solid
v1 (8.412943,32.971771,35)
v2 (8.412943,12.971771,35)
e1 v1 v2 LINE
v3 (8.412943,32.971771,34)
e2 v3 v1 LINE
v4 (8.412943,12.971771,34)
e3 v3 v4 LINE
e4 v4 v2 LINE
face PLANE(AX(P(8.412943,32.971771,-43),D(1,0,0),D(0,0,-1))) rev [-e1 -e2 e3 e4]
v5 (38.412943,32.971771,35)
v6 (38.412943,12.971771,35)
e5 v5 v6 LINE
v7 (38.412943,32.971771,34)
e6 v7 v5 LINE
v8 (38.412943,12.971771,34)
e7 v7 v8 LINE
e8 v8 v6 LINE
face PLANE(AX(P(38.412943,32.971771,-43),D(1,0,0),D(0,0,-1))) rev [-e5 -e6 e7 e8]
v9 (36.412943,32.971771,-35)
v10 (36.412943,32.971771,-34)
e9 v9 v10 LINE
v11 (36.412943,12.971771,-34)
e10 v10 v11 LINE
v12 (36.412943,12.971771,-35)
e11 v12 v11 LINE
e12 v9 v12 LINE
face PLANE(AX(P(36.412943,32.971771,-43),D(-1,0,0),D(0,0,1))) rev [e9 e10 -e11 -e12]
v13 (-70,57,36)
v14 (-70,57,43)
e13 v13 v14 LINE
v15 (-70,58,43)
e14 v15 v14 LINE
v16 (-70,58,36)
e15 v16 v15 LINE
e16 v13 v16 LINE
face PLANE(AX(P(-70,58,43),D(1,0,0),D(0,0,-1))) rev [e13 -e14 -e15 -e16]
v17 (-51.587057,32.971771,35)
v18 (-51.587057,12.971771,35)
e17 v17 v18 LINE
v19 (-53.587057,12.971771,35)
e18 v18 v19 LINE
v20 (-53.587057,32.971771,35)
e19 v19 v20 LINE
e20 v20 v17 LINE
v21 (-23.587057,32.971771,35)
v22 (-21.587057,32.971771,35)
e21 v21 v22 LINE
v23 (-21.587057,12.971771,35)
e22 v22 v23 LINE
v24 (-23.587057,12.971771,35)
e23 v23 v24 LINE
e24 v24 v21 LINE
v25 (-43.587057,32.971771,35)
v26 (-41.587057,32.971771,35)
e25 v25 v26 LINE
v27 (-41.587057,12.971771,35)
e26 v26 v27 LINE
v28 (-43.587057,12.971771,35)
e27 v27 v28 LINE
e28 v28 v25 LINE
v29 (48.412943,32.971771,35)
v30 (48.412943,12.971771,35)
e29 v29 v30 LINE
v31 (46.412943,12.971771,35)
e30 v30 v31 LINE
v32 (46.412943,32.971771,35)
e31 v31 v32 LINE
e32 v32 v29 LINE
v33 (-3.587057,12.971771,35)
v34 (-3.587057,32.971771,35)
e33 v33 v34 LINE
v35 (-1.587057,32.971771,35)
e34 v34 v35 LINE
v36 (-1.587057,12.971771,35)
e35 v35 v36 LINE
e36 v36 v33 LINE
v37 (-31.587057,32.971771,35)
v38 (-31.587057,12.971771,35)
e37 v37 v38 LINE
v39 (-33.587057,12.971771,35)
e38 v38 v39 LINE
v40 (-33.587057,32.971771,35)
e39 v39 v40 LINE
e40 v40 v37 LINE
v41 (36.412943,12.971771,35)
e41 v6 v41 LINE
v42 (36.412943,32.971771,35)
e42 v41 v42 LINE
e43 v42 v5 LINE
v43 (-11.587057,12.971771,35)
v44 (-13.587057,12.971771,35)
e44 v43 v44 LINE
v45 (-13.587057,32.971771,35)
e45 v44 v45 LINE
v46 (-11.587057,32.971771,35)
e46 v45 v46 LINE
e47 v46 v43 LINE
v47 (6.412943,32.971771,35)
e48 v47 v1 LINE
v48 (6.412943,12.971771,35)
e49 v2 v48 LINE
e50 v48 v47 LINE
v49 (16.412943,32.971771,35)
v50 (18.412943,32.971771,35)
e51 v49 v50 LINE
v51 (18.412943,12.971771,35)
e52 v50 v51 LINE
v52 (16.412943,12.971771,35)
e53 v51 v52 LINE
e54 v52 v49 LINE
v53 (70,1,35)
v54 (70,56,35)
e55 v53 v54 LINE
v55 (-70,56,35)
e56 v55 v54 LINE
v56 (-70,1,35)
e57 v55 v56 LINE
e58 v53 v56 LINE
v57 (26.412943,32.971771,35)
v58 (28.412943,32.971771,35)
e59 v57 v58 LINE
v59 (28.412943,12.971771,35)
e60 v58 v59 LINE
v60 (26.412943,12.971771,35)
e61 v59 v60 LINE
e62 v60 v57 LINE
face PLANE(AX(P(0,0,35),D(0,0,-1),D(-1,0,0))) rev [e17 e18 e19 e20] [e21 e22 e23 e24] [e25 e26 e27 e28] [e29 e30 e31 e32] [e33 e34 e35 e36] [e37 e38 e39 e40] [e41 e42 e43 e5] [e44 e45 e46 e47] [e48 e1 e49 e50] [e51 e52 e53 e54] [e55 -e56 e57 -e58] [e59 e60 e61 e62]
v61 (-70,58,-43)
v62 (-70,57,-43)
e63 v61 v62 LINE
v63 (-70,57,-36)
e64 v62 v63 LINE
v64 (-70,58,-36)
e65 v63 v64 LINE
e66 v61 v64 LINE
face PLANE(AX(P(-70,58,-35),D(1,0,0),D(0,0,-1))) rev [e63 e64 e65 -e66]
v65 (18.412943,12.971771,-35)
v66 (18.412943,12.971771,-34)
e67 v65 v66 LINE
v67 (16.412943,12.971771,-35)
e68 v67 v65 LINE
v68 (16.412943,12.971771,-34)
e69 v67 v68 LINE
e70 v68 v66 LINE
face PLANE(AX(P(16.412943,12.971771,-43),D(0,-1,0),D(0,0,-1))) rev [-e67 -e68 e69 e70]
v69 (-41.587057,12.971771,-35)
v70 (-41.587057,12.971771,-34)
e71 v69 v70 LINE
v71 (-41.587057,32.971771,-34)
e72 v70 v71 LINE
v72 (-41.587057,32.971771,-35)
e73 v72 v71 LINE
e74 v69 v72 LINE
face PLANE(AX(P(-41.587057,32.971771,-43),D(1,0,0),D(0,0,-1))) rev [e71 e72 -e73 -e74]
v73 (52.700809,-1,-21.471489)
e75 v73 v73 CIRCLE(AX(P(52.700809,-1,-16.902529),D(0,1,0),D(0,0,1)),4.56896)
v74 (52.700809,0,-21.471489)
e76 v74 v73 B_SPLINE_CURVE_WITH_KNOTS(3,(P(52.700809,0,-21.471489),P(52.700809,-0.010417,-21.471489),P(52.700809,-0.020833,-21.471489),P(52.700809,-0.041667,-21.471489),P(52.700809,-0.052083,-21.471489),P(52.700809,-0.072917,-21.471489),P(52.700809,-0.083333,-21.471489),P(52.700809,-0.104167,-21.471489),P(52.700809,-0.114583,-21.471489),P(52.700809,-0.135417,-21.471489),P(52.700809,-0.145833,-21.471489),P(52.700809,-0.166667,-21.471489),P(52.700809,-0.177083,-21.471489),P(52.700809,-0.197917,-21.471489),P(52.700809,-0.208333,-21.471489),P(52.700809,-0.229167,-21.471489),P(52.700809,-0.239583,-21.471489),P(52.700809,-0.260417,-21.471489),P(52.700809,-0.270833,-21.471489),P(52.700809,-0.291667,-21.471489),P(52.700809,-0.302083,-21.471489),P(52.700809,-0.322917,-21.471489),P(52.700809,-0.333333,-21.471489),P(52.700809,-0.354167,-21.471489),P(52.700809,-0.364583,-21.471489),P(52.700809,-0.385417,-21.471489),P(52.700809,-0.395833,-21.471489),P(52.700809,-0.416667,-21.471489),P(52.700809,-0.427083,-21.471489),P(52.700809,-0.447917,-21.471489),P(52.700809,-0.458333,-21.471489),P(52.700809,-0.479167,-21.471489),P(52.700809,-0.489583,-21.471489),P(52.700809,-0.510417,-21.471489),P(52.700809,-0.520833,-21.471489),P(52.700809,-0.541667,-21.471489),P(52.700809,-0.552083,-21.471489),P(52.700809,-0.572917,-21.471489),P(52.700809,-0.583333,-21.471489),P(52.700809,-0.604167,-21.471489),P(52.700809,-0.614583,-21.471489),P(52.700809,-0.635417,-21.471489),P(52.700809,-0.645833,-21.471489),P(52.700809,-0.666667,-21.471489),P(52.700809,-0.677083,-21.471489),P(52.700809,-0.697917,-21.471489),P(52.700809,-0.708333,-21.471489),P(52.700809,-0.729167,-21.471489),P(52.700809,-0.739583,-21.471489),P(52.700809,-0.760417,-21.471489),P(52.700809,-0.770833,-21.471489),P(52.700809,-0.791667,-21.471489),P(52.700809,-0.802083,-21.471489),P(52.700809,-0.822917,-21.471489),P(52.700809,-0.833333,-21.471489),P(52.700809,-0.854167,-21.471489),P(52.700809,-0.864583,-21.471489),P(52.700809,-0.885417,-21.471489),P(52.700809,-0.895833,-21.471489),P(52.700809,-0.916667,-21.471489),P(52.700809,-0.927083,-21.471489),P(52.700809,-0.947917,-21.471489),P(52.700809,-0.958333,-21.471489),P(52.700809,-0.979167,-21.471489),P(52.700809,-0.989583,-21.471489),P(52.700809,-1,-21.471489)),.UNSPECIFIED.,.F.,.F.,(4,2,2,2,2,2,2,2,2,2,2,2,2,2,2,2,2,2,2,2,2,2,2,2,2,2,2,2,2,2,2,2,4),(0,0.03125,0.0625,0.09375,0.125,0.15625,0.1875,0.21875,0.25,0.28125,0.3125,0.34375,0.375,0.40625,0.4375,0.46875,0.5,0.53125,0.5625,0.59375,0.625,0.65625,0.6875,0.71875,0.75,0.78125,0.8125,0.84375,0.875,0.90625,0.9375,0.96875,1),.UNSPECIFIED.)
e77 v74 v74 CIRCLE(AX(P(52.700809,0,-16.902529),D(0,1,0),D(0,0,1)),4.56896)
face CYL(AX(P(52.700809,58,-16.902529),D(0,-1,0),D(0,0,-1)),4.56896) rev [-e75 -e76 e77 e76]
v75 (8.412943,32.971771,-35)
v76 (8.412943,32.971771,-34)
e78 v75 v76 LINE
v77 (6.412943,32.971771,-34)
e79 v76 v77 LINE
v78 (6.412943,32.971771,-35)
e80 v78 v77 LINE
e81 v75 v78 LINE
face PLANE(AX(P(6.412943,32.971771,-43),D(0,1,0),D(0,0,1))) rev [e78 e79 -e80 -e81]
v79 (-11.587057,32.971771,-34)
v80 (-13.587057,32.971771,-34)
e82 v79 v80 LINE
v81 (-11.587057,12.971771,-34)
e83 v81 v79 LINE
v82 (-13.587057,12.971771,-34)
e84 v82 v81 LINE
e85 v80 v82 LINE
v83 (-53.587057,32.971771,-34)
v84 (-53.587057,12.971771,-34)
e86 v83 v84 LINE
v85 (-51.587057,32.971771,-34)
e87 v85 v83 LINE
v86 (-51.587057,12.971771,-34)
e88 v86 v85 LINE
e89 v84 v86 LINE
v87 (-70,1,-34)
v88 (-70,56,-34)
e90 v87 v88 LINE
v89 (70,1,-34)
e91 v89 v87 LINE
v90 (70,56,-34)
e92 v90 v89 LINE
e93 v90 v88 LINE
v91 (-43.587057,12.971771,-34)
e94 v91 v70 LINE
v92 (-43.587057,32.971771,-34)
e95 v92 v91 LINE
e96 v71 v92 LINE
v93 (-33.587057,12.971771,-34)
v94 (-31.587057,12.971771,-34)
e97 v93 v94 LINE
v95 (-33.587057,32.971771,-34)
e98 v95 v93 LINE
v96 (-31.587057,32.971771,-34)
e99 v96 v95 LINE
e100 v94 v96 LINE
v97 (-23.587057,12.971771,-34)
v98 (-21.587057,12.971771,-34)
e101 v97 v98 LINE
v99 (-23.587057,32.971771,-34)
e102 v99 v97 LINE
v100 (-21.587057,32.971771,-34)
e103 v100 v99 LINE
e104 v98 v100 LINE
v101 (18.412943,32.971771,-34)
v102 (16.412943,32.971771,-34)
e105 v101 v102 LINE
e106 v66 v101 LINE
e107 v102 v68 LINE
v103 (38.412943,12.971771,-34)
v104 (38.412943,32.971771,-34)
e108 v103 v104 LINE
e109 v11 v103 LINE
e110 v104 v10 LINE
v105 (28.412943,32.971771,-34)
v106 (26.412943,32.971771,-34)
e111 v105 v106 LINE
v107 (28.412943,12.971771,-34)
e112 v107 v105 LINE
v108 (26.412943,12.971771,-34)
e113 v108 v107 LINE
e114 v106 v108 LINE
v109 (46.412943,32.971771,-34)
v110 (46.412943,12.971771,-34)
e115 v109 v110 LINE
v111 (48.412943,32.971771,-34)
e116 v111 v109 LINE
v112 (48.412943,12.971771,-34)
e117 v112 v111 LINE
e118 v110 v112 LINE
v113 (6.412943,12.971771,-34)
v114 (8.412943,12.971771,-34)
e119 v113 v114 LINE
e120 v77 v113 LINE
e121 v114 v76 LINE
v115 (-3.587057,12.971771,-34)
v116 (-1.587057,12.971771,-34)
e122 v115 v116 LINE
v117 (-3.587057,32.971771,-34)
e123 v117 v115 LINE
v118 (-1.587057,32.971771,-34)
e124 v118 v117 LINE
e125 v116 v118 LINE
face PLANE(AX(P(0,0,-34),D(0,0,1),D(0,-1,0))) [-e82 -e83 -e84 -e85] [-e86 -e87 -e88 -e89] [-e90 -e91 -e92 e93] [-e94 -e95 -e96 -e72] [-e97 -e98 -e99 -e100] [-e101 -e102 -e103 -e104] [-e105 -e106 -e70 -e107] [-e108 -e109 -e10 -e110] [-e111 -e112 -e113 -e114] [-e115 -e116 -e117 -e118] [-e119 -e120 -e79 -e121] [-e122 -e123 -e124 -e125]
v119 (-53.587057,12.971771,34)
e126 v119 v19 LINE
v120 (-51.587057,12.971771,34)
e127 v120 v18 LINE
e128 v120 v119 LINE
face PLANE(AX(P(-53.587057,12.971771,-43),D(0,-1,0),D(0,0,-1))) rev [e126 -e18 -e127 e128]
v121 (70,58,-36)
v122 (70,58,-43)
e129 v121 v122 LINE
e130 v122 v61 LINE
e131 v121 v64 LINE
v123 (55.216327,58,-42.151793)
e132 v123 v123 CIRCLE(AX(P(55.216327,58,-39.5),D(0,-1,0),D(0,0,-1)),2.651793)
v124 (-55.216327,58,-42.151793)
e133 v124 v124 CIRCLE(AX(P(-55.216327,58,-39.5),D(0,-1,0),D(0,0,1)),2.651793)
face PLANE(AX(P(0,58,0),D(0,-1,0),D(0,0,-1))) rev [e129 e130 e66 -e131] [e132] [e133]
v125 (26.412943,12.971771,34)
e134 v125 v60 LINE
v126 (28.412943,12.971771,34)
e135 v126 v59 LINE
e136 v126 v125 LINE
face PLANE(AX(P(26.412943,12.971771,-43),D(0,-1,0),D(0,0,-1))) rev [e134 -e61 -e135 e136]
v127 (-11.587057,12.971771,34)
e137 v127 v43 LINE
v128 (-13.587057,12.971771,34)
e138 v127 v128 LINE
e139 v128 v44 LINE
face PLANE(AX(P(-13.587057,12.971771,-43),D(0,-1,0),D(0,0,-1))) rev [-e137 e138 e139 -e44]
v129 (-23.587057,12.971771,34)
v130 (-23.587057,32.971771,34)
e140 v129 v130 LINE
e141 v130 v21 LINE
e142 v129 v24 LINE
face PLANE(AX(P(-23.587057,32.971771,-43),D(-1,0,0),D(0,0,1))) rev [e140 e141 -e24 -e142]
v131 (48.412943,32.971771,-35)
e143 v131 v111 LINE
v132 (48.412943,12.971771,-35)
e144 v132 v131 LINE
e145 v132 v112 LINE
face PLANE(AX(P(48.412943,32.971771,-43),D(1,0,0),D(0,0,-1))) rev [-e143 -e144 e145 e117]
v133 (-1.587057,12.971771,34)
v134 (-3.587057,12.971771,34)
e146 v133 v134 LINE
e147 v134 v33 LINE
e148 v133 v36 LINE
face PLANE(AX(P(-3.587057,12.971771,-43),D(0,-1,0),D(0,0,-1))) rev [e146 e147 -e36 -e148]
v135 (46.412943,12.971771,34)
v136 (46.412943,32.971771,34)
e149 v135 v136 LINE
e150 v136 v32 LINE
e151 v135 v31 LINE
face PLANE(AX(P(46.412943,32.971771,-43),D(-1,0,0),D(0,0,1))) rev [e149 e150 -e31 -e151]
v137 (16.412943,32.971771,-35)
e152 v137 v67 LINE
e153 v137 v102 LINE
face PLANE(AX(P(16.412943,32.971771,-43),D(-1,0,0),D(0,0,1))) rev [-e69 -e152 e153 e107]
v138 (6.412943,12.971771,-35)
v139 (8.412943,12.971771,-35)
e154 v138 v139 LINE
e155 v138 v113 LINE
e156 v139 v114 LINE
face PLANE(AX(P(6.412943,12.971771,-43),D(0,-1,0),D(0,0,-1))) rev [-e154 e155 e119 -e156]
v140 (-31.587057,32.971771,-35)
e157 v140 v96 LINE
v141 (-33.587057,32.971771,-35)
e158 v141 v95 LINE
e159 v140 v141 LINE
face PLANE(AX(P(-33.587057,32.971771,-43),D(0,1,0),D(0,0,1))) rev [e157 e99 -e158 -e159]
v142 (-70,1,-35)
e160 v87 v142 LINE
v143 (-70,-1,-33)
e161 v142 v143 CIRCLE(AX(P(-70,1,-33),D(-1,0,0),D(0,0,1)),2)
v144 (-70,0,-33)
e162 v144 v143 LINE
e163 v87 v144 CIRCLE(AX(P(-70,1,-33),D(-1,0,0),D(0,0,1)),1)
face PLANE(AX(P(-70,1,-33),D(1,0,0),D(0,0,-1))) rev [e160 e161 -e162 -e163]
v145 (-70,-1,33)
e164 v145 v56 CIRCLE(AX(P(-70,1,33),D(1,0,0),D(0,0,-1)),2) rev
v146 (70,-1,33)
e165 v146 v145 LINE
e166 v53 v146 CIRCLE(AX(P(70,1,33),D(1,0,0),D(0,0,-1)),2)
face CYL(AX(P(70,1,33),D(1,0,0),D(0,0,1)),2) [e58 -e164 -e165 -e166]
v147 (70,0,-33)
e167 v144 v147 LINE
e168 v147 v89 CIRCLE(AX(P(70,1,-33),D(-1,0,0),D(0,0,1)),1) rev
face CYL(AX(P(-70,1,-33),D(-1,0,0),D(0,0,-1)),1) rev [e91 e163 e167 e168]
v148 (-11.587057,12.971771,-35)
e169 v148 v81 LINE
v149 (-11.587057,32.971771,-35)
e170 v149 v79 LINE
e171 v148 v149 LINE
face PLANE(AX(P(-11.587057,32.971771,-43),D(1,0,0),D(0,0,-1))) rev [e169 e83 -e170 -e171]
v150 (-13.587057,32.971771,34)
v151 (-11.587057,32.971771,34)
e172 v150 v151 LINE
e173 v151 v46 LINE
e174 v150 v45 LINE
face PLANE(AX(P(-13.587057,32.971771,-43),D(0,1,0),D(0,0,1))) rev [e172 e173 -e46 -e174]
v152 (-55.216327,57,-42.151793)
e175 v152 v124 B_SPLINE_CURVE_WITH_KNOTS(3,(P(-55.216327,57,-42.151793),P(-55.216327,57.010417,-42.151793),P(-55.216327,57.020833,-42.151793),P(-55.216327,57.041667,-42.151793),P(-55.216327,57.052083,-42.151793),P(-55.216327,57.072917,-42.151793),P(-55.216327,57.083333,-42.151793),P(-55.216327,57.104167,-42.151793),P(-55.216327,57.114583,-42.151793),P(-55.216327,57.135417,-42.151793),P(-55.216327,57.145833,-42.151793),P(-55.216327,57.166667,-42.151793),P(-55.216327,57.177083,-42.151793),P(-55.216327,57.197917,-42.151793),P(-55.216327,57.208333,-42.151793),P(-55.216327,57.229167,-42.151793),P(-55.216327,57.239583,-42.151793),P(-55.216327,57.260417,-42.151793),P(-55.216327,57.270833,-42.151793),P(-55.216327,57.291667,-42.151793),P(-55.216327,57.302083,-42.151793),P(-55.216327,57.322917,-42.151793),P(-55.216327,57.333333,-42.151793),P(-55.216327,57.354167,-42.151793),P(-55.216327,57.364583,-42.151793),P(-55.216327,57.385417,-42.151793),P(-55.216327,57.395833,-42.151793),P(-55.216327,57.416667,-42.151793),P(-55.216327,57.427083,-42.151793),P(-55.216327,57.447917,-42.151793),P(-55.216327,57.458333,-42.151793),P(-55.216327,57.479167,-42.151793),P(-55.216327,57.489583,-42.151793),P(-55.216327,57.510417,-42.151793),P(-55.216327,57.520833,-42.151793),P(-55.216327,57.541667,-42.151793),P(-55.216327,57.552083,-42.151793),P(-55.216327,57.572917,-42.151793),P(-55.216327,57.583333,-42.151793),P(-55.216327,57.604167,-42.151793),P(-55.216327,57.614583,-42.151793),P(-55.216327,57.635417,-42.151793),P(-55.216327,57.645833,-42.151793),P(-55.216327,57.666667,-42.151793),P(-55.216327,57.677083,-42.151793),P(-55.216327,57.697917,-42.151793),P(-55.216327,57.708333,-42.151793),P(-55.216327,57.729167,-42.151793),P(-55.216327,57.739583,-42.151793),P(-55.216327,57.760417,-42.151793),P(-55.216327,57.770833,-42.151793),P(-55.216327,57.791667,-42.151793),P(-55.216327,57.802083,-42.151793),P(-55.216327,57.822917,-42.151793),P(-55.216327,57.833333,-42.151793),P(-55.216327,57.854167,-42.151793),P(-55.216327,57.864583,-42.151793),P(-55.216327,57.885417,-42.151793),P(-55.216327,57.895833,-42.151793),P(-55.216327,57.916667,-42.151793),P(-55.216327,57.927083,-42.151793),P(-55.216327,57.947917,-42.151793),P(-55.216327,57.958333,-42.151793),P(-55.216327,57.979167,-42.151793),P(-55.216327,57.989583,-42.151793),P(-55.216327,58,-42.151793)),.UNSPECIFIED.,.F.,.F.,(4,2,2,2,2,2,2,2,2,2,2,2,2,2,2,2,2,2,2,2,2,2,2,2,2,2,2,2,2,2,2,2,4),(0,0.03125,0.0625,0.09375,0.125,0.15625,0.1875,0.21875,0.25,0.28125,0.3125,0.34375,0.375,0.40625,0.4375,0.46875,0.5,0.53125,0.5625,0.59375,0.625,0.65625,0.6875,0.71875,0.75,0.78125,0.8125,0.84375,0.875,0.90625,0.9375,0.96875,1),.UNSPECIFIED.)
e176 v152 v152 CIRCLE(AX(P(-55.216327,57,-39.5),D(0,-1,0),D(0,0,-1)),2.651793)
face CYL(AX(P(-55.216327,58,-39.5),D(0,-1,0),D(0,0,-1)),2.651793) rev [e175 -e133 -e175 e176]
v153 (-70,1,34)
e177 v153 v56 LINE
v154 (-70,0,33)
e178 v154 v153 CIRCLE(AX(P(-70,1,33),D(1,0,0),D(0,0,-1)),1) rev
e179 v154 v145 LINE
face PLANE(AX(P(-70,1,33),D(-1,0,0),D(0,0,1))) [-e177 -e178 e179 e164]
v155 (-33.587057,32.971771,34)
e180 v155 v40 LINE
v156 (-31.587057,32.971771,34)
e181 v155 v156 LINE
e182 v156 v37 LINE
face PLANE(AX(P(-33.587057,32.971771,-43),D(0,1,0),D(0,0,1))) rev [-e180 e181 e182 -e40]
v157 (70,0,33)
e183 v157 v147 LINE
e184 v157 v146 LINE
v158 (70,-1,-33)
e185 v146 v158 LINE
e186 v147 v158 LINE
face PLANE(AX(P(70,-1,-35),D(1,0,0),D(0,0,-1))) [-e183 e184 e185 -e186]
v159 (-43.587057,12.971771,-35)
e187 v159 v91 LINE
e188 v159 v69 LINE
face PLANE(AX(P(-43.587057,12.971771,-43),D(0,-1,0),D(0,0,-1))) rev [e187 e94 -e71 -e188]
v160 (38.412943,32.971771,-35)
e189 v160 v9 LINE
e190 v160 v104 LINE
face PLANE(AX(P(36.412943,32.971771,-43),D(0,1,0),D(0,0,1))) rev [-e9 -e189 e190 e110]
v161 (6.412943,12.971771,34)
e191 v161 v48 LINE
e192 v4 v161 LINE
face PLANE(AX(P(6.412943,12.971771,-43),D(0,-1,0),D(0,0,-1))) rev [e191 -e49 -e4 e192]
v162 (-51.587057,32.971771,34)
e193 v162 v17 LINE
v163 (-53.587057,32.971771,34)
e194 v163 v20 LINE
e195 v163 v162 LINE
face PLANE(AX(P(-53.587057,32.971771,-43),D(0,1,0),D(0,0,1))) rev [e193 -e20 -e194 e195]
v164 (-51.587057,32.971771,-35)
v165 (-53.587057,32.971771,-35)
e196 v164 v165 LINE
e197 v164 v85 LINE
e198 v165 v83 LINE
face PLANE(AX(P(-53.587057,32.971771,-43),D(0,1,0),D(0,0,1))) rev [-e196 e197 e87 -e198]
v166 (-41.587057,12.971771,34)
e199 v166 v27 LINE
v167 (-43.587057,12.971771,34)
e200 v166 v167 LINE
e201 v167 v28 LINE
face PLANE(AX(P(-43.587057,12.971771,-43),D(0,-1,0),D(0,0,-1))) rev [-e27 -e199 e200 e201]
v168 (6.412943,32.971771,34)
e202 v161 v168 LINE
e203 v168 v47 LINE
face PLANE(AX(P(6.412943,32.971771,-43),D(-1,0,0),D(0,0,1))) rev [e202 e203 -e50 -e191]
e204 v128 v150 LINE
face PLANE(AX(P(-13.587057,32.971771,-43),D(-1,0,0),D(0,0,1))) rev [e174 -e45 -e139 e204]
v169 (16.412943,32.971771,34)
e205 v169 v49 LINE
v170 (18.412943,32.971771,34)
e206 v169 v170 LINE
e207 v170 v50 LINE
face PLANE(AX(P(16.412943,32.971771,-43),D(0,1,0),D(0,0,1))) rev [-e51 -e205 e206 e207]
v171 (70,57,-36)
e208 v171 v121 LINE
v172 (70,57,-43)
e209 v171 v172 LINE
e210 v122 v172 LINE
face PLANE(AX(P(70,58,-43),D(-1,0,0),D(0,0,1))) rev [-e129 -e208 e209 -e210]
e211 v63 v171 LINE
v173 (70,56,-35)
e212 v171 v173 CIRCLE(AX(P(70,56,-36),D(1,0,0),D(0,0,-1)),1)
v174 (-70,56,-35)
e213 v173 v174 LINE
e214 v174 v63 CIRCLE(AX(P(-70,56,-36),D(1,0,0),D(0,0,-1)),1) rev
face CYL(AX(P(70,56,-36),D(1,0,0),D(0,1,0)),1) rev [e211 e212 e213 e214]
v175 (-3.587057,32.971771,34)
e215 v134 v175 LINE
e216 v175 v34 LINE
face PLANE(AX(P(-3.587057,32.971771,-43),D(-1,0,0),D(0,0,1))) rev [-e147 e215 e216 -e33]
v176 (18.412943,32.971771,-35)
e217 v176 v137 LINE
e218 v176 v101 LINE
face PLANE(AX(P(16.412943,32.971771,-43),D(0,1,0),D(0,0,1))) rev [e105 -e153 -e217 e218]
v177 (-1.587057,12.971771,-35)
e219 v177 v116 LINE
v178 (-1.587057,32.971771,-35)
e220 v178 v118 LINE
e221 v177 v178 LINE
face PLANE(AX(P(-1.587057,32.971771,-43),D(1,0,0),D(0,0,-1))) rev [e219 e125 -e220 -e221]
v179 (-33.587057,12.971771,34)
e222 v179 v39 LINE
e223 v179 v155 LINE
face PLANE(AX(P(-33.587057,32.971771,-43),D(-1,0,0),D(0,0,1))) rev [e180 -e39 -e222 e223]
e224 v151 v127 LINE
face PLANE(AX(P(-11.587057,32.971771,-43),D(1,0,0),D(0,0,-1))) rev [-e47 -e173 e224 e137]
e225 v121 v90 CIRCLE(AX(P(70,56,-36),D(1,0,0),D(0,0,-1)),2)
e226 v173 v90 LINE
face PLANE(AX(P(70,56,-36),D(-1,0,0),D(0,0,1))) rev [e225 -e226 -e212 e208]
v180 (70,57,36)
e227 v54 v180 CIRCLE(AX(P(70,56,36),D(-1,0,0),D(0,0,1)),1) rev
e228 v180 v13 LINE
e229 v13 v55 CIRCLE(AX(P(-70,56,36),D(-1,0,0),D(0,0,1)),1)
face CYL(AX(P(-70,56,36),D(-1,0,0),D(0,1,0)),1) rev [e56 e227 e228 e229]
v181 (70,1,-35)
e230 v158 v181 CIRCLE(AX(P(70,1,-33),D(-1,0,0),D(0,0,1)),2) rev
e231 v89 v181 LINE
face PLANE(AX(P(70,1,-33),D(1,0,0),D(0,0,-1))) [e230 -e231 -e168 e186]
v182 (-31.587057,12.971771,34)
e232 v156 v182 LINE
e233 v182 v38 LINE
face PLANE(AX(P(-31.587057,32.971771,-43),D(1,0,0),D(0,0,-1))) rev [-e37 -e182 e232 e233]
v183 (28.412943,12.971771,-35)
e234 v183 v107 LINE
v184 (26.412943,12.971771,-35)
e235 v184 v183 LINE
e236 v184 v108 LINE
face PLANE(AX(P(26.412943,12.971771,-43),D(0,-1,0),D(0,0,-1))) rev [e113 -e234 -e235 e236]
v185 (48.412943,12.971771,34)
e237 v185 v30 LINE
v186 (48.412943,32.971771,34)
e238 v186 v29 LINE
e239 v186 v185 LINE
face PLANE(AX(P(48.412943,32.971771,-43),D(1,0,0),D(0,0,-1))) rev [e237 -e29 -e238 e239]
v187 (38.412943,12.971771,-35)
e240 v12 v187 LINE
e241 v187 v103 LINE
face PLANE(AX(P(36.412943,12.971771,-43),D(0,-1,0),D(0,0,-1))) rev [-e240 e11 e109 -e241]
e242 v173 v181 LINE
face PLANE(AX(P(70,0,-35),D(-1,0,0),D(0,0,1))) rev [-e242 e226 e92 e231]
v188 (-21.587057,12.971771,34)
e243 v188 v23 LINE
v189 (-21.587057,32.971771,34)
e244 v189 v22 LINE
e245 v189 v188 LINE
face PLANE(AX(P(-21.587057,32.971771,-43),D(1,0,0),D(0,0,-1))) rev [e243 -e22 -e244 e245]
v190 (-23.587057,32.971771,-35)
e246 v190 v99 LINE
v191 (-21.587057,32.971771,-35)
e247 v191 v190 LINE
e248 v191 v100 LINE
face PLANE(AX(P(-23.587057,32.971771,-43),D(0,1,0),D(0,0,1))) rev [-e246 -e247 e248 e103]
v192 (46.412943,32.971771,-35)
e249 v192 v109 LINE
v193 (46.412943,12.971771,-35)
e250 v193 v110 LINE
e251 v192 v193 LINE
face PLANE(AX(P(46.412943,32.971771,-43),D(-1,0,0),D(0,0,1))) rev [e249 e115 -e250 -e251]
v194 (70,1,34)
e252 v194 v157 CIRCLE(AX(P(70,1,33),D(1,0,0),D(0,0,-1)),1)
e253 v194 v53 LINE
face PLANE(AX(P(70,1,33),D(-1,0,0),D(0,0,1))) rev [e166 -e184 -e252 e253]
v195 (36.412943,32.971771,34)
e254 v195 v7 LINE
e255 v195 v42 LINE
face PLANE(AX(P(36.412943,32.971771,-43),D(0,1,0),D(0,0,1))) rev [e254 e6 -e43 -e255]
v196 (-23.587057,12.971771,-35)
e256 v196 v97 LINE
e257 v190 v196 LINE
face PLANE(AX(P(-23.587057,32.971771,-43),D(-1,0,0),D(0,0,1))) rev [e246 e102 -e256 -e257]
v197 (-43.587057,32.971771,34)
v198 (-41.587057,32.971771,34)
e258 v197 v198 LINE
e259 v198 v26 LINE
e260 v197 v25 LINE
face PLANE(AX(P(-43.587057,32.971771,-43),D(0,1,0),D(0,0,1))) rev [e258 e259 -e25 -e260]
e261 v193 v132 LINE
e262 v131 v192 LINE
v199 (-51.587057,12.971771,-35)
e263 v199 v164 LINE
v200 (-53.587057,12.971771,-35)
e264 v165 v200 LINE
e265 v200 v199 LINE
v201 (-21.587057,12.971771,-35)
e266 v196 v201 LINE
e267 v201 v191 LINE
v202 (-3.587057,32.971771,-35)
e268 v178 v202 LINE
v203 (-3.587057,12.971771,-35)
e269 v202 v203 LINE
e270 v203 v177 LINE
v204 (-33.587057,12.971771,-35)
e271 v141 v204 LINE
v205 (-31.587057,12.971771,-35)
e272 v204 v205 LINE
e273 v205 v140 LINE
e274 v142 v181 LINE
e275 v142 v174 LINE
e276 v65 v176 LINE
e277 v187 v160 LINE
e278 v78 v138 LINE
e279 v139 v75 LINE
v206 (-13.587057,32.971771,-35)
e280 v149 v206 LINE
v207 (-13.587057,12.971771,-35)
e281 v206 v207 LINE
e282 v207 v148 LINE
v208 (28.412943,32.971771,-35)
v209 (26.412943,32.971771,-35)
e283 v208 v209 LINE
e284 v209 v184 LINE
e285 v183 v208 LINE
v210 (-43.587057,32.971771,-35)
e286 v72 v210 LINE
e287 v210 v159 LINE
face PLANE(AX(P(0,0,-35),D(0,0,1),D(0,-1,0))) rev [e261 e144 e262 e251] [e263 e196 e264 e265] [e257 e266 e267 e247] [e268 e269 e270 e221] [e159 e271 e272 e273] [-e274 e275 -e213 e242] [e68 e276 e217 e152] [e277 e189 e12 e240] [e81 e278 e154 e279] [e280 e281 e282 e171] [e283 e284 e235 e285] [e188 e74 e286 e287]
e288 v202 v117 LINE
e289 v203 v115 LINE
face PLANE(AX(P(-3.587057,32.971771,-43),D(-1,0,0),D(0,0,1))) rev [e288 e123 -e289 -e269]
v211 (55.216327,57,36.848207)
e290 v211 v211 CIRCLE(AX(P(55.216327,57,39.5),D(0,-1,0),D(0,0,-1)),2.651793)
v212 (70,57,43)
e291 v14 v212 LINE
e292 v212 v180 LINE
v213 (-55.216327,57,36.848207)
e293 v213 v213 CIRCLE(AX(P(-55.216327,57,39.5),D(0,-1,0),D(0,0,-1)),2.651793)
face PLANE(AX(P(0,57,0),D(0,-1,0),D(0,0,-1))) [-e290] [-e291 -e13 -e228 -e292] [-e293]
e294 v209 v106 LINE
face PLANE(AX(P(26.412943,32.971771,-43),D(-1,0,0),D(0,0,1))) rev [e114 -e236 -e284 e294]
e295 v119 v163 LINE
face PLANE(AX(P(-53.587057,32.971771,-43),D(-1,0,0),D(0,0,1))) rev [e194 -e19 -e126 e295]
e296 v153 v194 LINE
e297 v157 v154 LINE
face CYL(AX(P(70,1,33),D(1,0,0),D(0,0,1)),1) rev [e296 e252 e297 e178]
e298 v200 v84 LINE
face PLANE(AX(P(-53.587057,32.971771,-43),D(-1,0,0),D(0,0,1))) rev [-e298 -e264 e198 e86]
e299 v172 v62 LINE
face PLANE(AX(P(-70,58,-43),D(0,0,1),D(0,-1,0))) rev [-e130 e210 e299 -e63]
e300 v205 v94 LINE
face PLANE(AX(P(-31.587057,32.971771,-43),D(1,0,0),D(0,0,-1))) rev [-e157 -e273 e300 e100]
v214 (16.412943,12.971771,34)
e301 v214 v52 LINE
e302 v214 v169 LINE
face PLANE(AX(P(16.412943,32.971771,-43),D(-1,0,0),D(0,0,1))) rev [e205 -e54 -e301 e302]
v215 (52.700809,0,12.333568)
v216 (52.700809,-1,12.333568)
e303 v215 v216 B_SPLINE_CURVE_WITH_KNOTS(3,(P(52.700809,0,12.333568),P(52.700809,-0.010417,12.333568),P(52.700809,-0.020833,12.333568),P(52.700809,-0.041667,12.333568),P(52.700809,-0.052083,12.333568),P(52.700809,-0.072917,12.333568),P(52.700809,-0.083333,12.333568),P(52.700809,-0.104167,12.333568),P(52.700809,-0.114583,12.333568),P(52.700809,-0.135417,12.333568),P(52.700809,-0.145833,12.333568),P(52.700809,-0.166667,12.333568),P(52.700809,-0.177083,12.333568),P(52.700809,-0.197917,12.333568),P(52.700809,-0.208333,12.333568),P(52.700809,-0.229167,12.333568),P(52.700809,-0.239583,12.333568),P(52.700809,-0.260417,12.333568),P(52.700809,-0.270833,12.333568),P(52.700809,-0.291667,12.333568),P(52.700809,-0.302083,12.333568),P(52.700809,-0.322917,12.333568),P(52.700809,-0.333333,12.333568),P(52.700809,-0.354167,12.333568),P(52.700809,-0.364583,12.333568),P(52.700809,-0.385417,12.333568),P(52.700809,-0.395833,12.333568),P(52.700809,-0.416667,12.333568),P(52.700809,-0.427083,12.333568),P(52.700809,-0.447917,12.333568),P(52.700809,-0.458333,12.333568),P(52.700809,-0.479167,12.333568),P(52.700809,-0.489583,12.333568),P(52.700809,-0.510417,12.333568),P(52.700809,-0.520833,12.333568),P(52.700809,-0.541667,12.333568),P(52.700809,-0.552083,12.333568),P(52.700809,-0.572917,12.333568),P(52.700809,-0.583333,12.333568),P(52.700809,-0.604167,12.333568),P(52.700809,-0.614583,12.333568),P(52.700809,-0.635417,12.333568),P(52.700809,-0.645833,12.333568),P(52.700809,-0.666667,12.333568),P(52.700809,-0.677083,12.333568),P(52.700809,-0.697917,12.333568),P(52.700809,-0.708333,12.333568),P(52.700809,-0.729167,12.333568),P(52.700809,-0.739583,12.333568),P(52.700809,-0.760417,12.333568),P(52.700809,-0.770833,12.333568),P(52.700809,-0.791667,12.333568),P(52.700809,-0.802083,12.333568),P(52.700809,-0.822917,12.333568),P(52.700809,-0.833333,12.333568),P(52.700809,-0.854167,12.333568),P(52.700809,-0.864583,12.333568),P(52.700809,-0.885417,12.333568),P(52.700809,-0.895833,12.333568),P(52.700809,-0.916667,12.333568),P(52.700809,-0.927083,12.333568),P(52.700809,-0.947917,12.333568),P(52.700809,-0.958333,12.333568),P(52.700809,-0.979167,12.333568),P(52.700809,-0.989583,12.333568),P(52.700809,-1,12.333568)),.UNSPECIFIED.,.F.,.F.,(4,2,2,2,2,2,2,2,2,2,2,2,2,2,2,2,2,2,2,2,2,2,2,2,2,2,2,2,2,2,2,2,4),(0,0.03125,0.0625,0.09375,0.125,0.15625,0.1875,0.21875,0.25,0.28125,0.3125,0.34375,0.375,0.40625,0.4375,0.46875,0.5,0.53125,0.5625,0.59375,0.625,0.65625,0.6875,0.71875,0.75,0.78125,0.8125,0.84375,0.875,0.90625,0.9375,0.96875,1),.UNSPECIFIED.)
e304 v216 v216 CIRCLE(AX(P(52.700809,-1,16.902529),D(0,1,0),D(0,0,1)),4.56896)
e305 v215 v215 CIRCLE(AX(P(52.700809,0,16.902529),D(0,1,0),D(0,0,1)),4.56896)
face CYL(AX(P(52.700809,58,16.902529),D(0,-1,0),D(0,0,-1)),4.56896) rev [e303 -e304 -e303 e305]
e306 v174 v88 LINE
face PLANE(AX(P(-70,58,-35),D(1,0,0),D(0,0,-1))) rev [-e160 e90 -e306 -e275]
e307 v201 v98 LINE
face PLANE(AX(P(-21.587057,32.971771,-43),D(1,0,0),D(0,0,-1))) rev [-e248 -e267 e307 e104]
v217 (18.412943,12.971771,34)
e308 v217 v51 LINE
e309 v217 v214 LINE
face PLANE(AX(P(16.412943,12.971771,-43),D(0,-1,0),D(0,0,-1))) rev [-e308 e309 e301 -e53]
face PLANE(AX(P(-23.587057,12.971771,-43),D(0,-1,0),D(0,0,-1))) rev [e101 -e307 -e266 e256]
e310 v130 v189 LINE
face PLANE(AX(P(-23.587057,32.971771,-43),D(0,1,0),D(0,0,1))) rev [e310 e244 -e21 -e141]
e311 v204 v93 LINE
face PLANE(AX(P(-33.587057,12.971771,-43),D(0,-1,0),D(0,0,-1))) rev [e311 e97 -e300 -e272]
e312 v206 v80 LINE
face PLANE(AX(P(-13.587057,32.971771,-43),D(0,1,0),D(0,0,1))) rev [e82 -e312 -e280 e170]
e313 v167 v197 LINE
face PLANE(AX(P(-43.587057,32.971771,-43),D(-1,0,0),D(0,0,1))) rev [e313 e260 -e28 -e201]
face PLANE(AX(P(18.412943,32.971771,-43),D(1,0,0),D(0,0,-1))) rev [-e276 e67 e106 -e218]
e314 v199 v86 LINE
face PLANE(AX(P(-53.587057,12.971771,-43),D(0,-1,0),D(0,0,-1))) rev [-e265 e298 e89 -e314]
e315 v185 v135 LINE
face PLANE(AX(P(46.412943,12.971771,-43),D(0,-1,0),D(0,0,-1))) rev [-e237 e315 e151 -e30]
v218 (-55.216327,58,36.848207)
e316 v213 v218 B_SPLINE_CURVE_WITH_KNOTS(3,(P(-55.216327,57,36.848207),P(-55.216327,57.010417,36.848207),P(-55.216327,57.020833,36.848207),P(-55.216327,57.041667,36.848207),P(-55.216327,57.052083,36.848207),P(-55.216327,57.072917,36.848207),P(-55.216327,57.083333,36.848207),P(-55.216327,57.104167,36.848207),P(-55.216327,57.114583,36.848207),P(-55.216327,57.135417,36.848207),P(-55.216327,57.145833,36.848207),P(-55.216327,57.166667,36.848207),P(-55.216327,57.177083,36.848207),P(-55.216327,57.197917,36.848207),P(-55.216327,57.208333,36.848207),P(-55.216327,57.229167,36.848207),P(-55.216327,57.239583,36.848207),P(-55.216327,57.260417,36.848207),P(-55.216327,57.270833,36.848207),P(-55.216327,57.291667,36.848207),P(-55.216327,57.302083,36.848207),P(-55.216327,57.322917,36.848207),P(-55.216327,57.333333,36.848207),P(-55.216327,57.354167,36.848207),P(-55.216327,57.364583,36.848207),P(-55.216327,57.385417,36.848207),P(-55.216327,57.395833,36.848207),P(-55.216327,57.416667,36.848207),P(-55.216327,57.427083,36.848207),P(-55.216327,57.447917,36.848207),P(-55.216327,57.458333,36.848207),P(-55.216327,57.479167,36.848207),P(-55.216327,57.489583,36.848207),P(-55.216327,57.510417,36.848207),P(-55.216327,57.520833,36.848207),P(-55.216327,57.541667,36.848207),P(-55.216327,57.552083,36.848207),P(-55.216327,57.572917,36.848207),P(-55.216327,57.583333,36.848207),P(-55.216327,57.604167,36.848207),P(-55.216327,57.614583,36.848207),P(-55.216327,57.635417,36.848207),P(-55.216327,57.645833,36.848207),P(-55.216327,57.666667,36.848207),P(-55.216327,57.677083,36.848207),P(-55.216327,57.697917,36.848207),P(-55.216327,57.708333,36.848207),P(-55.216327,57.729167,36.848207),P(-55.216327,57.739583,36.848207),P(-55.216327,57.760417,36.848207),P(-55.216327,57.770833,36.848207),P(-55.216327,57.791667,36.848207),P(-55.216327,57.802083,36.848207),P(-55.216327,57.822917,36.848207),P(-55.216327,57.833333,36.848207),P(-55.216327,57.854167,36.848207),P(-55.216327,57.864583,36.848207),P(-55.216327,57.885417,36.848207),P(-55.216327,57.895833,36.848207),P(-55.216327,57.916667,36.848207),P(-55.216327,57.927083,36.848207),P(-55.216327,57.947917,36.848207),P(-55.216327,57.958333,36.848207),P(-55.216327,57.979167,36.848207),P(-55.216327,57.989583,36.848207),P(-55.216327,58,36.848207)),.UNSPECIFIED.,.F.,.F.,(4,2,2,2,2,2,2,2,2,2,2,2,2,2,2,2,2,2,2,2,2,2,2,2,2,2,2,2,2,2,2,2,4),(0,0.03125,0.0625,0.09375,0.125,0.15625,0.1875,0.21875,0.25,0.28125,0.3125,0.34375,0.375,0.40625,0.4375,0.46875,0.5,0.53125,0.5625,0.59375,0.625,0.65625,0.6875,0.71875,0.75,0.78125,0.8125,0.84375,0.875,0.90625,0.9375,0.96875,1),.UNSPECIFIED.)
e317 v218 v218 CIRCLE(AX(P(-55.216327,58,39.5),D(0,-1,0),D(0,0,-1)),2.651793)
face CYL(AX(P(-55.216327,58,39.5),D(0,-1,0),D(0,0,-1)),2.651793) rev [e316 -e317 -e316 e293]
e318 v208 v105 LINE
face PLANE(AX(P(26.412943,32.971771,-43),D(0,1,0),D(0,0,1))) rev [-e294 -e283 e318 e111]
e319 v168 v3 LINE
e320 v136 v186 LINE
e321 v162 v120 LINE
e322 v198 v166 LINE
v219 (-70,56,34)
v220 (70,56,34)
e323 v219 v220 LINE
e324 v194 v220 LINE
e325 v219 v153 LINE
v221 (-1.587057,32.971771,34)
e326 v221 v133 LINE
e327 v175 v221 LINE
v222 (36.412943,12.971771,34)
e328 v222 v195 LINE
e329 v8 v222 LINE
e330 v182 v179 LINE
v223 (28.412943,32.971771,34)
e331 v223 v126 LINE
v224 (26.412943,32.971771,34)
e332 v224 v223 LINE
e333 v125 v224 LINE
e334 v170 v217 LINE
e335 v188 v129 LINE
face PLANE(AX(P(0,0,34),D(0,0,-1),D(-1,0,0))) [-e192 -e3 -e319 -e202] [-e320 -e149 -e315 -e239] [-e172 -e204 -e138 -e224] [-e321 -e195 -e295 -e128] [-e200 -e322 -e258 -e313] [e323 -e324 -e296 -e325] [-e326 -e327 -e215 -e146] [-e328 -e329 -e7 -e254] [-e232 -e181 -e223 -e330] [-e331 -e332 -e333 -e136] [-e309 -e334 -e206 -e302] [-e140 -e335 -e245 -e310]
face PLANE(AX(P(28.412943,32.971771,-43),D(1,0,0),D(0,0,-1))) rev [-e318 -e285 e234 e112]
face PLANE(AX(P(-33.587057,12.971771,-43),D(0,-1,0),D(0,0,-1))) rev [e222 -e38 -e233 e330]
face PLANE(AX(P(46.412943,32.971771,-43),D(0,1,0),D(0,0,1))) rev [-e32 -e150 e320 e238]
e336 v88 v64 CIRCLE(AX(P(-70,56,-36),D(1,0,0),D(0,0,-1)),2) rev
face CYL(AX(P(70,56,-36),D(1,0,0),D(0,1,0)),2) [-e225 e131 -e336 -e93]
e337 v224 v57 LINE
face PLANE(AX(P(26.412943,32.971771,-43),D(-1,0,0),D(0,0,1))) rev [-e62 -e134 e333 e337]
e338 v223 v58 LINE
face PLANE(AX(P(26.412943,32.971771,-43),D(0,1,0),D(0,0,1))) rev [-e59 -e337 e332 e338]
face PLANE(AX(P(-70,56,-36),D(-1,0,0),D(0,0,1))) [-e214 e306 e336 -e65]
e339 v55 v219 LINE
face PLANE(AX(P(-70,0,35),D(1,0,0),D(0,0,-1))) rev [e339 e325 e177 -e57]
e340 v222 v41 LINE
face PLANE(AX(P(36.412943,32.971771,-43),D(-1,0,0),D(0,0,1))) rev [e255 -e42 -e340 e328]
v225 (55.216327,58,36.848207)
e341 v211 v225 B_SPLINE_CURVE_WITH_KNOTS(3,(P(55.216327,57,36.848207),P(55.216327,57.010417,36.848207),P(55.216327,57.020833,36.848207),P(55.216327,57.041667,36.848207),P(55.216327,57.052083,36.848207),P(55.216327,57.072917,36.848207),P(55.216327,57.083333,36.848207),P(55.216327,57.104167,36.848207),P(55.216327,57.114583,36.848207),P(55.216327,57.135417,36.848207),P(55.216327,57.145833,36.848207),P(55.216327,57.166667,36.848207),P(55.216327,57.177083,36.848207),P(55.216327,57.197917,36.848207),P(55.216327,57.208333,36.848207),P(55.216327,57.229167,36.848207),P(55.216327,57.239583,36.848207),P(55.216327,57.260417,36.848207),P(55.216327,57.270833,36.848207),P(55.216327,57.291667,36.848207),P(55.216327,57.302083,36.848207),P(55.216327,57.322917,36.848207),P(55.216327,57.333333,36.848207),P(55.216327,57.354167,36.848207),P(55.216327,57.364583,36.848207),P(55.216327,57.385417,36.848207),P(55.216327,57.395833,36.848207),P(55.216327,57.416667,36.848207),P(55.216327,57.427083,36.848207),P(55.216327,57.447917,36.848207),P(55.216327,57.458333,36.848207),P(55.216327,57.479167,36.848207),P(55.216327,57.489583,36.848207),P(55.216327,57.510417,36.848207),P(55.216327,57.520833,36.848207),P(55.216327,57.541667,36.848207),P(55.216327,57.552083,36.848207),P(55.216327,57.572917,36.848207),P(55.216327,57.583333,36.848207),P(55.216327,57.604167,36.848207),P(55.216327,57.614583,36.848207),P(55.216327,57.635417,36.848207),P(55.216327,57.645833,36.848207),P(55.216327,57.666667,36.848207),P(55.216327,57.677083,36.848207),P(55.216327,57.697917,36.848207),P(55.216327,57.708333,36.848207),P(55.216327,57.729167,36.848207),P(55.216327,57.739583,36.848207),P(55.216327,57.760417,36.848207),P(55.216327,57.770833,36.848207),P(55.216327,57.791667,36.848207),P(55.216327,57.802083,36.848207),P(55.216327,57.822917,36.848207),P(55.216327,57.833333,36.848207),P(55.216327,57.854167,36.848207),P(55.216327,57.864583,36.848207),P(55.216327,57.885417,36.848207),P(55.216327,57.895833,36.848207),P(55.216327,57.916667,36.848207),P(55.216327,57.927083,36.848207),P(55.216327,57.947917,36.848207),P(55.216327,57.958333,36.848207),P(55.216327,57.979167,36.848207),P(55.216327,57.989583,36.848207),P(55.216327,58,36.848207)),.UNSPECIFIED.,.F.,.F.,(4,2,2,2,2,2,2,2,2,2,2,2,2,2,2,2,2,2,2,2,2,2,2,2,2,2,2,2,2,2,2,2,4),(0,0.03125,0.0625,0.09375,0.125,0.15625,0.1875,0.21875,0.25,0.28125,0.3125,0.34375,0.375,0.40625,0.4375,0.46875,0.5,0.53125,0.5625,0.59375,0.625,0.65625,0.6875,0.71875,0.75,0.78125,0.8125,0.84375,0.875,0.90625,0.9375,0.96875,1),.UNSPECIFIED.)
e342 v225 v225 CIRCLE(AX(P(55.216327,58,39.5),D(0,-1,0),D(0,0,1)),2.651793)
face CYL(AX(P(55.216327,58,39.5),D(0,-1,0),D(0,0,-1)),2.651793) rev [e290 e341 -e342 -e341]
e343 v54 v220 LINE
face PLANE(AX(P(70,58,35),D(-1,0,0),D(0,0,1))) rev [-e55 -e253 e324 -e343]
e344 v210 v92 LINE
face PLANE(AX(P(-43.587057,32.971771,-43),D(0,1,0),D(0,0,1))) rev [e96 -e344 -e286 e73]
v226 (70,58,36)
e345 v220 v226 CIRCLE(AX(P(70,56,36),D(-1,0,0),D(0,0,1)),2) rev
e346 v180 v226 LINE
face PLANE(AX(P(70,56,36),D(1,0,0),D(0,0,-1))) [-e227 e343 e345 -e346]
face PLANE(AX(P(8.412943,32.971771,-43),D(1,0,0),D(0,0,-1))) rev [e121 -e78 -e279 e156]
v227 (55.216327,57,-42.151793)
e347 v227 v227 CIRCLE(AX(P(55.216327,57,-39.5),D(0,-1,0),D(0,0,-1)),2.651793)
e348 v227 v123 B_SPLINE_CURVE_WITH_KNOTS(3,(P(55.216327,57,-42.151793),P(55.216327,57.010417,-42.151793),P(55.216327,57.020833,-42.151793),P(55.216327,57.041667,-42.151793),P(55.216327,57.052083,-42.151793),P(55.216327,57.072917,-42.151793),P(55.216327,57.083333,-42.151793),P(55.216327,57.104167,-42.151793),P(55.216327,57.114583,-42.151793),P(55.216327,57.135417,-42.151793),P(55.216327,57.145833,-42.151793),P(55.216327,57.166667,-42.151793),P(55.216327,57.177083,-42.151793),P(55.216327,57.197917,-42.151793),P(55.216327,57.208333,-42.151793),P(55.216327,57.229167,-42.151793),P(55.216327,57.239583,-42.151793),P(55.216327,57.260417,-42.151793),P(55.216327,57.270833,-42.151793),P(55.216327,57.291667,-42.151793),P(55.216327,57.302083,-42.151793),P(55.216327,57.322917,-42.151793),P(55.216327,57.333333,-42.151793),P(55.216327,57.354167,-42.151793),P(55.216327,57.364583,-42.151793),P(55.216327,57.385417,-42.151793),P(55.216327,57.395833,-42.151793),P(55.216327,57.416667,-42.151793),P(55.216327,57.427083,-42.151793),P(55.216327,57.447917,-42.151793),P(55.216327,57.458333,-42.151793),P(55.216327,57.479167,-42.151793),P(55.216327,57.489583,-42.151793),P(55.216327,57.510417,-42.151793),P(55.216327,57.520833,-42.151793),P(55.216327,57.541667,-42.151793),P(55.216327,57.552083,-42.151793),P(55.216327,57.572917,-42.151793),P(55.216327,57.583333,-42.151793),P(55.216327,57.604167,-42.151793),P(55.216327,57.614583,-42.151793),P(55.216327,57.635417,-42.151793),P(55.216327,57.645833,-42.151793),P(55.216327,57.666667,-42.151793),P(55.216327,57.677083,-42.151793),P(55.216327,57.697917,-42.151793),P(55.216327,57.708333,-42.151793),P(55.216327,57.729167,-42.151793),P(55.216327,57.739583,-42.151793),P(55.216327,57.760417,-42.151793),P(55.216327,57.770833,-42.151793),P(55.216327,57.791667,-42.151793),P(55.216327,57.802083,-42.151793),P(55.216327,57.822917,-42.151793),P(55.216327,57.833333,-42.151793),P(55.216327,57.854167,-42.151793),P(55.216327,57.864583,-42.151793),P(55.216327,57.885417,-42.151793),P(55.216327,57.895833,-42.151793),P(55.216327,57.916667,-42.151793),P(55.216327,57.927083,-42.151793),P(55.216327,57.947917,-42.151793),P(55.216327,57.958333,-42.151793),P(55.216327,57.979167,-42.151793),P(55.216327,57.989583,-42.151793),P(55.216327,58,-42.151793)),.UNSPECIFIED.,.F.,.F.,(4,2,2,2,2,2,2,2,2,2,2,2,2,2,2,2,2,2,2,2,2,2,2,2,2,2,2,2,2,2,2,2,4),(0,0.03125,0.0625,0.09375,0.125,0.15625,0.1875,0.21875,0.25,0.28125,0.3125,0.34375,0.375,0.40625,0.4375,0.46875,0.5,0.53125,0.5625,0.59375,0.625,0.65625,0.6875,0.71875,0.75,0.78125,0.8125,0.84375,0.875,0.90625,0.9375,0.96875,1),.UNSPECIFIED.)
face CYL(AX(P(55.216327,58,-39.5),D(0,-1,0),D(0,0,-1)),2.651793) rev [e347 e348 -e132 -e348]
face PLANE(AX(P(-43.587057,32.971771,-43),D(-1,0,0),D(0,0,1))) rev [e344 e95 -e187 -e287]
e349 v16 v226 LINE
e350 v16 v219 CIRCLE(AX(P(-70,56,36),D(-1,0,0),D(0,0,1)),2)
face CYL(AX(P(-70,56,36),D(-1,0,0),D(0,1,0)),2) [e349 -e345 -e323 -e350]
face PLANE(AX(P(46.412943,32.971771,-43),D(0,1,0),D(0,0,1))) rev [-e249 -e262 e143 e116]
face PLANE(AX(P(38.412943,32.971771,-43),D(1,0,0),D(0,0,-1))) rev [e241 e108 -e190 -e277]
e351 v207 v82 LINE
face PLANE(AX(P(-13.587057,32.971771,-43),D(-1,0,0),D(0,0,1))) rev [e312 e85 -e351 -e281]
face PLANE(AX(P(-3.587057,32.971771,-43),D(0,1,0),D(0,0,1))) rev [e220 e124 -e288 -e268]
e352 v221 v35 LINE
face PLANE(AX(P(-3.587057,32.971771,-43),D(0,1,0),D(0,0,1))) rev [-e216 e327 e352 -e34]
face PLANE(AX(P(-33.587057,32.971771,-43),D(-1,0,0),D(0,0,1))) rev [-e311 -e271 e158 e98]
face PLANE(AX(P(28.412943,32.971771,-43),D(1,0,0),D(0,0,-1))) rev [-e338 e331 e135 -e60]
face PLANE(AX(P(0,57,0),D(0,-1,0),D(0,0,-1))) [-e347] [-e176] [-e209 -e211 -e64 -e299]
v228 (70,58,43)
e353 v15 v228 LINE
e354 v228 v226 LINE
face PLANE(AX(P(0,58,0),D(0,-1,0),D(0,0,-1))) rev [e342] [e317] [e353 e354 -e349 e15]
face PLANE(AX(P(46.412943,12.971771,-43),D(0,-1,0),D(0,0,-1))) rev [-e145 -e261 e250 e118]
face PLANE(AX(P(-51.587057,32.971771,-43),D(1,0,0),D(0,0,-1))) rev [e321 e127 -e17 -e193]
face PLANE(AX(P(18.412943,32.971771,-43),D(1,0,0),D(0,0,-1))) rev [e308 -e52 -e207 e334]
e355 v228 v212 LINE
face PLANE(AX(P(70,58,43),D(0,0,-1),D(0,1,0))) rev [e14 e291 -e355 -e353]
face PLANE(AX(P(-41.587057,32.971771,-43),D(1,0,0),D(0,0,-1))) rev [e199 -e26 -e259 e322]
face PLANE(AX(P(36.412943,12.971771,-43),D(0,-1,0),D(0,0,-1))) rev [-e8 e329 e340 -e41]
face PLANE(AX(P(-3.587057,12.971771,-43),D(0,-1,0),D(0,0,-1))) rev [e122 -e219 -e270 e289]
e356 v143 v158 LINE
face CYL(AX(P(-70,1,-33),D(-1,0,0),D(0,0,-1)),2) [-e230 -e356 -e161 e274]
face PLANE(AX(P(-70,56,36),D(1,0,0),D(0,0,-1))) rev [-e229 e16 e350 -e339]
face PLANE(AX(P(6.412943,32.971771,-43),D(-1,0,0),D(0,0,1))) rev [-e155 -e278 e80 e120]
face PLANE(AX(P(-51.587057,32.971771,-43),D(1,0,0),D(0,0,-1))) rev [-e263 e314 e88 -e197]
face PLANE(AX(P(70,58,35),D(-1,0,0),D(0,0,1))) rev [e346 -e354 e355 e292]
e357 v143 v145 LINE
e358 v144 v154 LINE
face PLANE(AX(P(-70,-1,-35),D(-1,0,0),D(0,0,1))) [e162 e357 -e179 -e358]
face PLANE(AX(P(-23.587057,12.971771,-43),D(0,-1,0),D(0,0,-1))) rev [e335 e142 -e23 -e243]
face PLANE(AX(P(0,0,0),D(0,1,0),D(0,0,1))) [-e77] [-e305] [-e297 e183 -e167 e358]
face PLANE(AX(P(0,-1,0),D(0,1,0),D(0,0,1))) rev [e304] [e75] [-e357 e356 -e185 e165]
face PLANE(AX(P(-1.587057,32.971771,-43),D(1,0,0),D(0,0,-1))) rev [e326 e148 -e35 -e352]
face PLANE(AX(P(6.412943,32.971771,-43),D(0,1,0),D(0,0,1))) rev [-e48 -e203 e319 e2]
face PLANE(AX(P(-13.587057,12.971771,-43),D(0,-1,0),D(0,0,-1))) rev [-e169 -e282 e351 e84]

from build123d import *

# Parameters (mm, degrees)
SKETCH1_W                      = 140
SKETCH1_H                      = 70
BASE_FLANGE1_DEPTH             = 1
EDGE_FLANGE1_STRIP_W           = 6
EDGE_FLANGE1_STRIP_H           = 1
EDGE_FLANGE1_STRIP_CUT_DEPTH   = 140
EDGE_FLANGE1_STRIP_2_W         = 6
EDGE_FLANGE1_STRIP_2_H         = 1
EDGE_FLANGE1_STRIP_CUT_2_DEPTH = 140
EDGE_FLANGE1_DEPTH             = 140
EDGE_FLANGE1_BEND_DEPTH        = 140
EDGE_FLANGE2_STRIP_W           = 6
EDGE_FLANGE2_STRIP_H           = 1
EDGE_FLANGE2_STRIP_CUT_DEPTH   = 140
EDGE_FLANGE2_DEPTH             = 140
EDGE_FLANGE3_STRIP_W           = 6
EDGE_FLANGE3_STRIP_H           = 1
EDGE_FLANGE3_STRIP_CUT_DEPTH   = 140
EDGE_FLANGE3_DEPTH             = 140
CUT_EXTRUDE1_DEPTH             = 120.783137378
CUT_EXTRUDE1_DEPTH_BACK        = 120.783137378
SKETCH18_W                     = 2
SKETCH18_H                     = 20
CUT_EXTRUDE2_DEPTH             = 101.56341283
CUT_EXTRUDE2_DEPTH_BACK        = 101.56341283
SKETCH20_R                     = 2.651793261
CUT_EXTRUDE3_DEPTH             = 102.143462468
CUT_EXTRUDE3_DEPTH_BACK        = 102.143462468
SKETCH21_R                     = 4.568960442


# Sheet-metal steps are written as plain solids
with BuildPart() as part:
    # Sketch1 → Base-Flange1 (new body)
    with BuildSketch(Plane(origin=(0, 0, 0), x_dir=(1, 0, 0), z_dir=(0, 1, 0))):
        Rectangle(SKETCH1_W, SKETCH1_H)
    extrude(amount=-BASE_FLANGE1_DEPTH)

    # Edge-Flange1 strip (across the edge) → Edge-Flange1 strip cut (cut)
    with BuildSketch(Plane(origin=(-70, 0, 35), x_dir=(0, 0, -1), z_dir=(1, 0, 0))):
        with Locations((-1, -0.5)):
            Rectangle(EDGE_FLANGE1_STRIP_W, EDGE_FLANGE1_STRIP_H)
    extrude(amount=EDGE_FLANGE1_STRIP_CUT_DEPTH, mode=Mode.SUBTRACT)

    # Edge-Flange1 strip 2 (across the edge) → Edge-Flange1 strip cut 2 (cut)
    with BuildSketch(Plane(origin=(70, 0, -35), x_dir=(0, 0, 1), z_dir=(-1, 0, 0))):
        with Locations((-1, -0.5)):
            Rectangle(EDGE_FLANGE1_STRIP_2_W, EDGE_FLANGE1_STRIP_2_H)
    extrude(amount=EDGE_FLANGE1_STRIP_CUT_2_DEPTH, mode=Mode.SUBTRACT)

    # Edge-Flange1 section (across the edge) → Edge-Flange1 (add)
    with BuildSketch(Plane(origin=(-70, 0, 35), x_dir=(0, 0, -1), z_dir=(1, 0, 0))):
        with BuildLine():
            Line((0, 1), (0, 58))
            Line((0, 58), (1, 58))
            Line((1, 58), (1, 1))
            ThreePointArc((1, 1), (1.292893219, 0.292893219), (2, 0))
            Line((2, 0), (2, -1))
            ThreePointArc((2, -1), (0.585786438, -0.414213562), (0, 1))
        make_face()
    extrude(amount=EDGE_FLANGE1_DEPTH)

    # Edge-Flange1 section 2 (across the edge) → Edge-Flange1 bend (add)
    with BuildSketch(Plane(origin=(70, 0, -35), x_dir=(0, 0, 1), z_dir=(-1, 0, 0))):
        with BuildLine():
            Line((0, 1), (0, 58))
            Line((0, 58), (1, 58))
            Line((1, 58), (1, 1))
            ThreePointArc((1, 1), (1.292893219, 0.292893219), (2, 0))
            Line((2, 0), (2, -1))
            ThreePointArc((2, -1), (0.585786438, -0.414213562), (0, 1))
        make_face()
    extrude(amount=EDGE_FLANGE1_BEND_DEPTH)

    # Edge-Flange2 strip (across the edge) → Edge-Flange2 strip cut (cut)
    with BuildSketch(Plane(origin=(70, 58, 35), x_dir=(0, -1, 0), z_dir=(-1, 0, 0))):
        with Locations((-1, -0.5)):
            Rectangle(EDGE_FLANGE2_STRIP_W, EDGE_FLANGE2_STRIP_H)
    extrude(amount=EDGE_FLANGE2_STRIP_CUT_DEPTH, mode=Mode.SUBTRACT)

    # Edge-Flange2 section (across the edge) → Edge-Flange2 (add)
    with BuildSketch(Plane(origin=(70, 58, 35), x_dir=(0, -1, 0), z_dir=(-1, 0, 0))):
        with BuildLine():
            Line((0, 1), (0, 8))
            Line((0, 8), (1, 8))
            Line((1, 8), (1, 1))
            ThreePointArc((1, 1), (1.292893219, 0.292893219), (2, 0))
            Line((2, 0), (2, -1))
            ThreePointArc((2, -1), (0.585786438, -0.414213562), (0, 1))
        make_face()
    extrude(amount=EDGE_FLANGE2_DEPTH)

    # Edge-Flange3 strip (across the edge) → Edge-Flange3 strip cut (cut)
    with BuildSketch(Plane(origin=(-70, 58, -35), x_dir=(0, -1, 0), z_dir=(1, 0, 0))):
        with Locations((-1, -0.5)):
            Rectangle(EDGE_FLANGE3_STRIP_W, EDGE_FLANGE3_STRIP_H)
    extrude(amount=EDGE_FLANGE3_STRIP_CUT_DEPTH, mode=Mode.SUBTRACT)

    # Edge-Flange3 section (across the edge) → Edge-Flange3 (add)
    with BuildSketch(Plane(origin=(-70, 58, -35), x_dir=(0, -1, 0), z_dir=(1, 0, 0))):
        with BuildLine():
            Line((0, 1), (0, 8))
            Line((0, 8), (1, 8))
            Line((1, 8), (1, 1))
            ThreePointArc((1, 1), (1.292893219, 0.292893219), (2, 0))
            Line((2, 0), (2, -1))
            ThreePointArc((2, -1), (0.585786438, -0.414213562), (0, 1))
        make_face()
    extrude(amount=EDGE_FLANGE3_DEPTH)

    # Sketch18 → Cut-Extrude1 (cut, two sides: drawn at the far end of the back side and taken through both)
    with BuildSketch(Plane.XY.offset(35).offset(-CUT_EXTRUDE1_DEPTH_BACK)):
        with Locations((-42.587057136, 22.971771136)):
            Rectangle(SKETCH18_W, SKETCH18_H)
        with Locations((-52.587057136, 22.971771136)):
            Rectangle(SKETCH18_W, SKETCH18_H)
        with Locations((-32.587057136, 22.971771136)):
            Rectangle(SKETCH18_W, SKETCH18_H)
        with Locations((-22.587057136, 22.971771136)):
            Rectangle(SKETCH18_W, SKETCH18_H)
        with Locations((-12.587057136, 22.971771136)):
            Rectangle(SKETCH18_W, SKETCH18_H)
        with Locations((-2.587057136, 22.971771136)):
            Rectangle(SKETCH18_W, SKETCH18_H)
        with Locations((7.412942864, 22.971771136)):
            Rectangle(SKETCH18_W, SKETCH18_H)
        with Locations((17.412942864, 22.971771136)):
            Rectangle(SKETCH18_W, SKETCH18_H)
        with Locations((27.412942864, 22.971771136)):
            Rectangle(SKETCH18_W, SKETCH18_H)
        with Locations((37.412942864, 22.971771136)):
            Rectangle(SKETCH18_W, SKETCH18_H)
        with Locations((47.412942864, 22.971771136)):
            Rectangle(SKETCH18_W, SKETCH18_H)
    extrude(amount=CUT_EXTRUDE1_DEPTH + CUT_EXTRUDE1_DEPTH_BACK, mode=Mode.SUBTRACT)

    # Sketch20 → Cut-Extrude2 (cut, two sides: drawn at the far end of the back side and taken through both)
    with BuildSketch(Plane.XZ.offset(-57).offset(-CUT_EXTRUDE2_DEPTH_BACK)):
        with Locations(Location((-55.216327322, 39.5, 0), (0, 0, 270))):
            Circle(SKETCH20_R)
        with Locations(Location((-55.216327322, -39.5, 0), (0, 0, 270))):
            Circle(SKETCH20_R)
        with Locations(Location((55.216327322, -39.5, 0), (0, 0, 270))):
            Circle(SKETCH20_R)
        with Locations(Location((55.216327322, 39.5, 0), (0, 0, 270))):
            Circle(SKETCH20_R)
    extrude(amount=CUT_EXTRUDE2_DEPTH + CUT_EXTRUDE2_DEPTH_BACK, mode=Mode.SUBTRACT)

    # Sketch21 → Cut-Extrude3 (cut, two sides: drawn at the far end of the back side and taken through both)
    with BuildSketch(Plane.XZ.offset(1).offset(-CUT_EXTRUDE3_DEPTH_BACK)):
        with Locations(Location((52.700809146, 16.902528803, 0), (0, 0, 270))):
            Circle(SKETCH21_R)
        with Locations(Location((52.700809146, -16.902528803, 0), (0, 0, 270))):
            Circle(SKETCH21_R)
    extrude(amount=CUT_EXTRUDE3_DEPTH + CUT_EXTRUDE3_DEPTH_BACK, mode=Mode.SUBTRACT)


solid = part.part
